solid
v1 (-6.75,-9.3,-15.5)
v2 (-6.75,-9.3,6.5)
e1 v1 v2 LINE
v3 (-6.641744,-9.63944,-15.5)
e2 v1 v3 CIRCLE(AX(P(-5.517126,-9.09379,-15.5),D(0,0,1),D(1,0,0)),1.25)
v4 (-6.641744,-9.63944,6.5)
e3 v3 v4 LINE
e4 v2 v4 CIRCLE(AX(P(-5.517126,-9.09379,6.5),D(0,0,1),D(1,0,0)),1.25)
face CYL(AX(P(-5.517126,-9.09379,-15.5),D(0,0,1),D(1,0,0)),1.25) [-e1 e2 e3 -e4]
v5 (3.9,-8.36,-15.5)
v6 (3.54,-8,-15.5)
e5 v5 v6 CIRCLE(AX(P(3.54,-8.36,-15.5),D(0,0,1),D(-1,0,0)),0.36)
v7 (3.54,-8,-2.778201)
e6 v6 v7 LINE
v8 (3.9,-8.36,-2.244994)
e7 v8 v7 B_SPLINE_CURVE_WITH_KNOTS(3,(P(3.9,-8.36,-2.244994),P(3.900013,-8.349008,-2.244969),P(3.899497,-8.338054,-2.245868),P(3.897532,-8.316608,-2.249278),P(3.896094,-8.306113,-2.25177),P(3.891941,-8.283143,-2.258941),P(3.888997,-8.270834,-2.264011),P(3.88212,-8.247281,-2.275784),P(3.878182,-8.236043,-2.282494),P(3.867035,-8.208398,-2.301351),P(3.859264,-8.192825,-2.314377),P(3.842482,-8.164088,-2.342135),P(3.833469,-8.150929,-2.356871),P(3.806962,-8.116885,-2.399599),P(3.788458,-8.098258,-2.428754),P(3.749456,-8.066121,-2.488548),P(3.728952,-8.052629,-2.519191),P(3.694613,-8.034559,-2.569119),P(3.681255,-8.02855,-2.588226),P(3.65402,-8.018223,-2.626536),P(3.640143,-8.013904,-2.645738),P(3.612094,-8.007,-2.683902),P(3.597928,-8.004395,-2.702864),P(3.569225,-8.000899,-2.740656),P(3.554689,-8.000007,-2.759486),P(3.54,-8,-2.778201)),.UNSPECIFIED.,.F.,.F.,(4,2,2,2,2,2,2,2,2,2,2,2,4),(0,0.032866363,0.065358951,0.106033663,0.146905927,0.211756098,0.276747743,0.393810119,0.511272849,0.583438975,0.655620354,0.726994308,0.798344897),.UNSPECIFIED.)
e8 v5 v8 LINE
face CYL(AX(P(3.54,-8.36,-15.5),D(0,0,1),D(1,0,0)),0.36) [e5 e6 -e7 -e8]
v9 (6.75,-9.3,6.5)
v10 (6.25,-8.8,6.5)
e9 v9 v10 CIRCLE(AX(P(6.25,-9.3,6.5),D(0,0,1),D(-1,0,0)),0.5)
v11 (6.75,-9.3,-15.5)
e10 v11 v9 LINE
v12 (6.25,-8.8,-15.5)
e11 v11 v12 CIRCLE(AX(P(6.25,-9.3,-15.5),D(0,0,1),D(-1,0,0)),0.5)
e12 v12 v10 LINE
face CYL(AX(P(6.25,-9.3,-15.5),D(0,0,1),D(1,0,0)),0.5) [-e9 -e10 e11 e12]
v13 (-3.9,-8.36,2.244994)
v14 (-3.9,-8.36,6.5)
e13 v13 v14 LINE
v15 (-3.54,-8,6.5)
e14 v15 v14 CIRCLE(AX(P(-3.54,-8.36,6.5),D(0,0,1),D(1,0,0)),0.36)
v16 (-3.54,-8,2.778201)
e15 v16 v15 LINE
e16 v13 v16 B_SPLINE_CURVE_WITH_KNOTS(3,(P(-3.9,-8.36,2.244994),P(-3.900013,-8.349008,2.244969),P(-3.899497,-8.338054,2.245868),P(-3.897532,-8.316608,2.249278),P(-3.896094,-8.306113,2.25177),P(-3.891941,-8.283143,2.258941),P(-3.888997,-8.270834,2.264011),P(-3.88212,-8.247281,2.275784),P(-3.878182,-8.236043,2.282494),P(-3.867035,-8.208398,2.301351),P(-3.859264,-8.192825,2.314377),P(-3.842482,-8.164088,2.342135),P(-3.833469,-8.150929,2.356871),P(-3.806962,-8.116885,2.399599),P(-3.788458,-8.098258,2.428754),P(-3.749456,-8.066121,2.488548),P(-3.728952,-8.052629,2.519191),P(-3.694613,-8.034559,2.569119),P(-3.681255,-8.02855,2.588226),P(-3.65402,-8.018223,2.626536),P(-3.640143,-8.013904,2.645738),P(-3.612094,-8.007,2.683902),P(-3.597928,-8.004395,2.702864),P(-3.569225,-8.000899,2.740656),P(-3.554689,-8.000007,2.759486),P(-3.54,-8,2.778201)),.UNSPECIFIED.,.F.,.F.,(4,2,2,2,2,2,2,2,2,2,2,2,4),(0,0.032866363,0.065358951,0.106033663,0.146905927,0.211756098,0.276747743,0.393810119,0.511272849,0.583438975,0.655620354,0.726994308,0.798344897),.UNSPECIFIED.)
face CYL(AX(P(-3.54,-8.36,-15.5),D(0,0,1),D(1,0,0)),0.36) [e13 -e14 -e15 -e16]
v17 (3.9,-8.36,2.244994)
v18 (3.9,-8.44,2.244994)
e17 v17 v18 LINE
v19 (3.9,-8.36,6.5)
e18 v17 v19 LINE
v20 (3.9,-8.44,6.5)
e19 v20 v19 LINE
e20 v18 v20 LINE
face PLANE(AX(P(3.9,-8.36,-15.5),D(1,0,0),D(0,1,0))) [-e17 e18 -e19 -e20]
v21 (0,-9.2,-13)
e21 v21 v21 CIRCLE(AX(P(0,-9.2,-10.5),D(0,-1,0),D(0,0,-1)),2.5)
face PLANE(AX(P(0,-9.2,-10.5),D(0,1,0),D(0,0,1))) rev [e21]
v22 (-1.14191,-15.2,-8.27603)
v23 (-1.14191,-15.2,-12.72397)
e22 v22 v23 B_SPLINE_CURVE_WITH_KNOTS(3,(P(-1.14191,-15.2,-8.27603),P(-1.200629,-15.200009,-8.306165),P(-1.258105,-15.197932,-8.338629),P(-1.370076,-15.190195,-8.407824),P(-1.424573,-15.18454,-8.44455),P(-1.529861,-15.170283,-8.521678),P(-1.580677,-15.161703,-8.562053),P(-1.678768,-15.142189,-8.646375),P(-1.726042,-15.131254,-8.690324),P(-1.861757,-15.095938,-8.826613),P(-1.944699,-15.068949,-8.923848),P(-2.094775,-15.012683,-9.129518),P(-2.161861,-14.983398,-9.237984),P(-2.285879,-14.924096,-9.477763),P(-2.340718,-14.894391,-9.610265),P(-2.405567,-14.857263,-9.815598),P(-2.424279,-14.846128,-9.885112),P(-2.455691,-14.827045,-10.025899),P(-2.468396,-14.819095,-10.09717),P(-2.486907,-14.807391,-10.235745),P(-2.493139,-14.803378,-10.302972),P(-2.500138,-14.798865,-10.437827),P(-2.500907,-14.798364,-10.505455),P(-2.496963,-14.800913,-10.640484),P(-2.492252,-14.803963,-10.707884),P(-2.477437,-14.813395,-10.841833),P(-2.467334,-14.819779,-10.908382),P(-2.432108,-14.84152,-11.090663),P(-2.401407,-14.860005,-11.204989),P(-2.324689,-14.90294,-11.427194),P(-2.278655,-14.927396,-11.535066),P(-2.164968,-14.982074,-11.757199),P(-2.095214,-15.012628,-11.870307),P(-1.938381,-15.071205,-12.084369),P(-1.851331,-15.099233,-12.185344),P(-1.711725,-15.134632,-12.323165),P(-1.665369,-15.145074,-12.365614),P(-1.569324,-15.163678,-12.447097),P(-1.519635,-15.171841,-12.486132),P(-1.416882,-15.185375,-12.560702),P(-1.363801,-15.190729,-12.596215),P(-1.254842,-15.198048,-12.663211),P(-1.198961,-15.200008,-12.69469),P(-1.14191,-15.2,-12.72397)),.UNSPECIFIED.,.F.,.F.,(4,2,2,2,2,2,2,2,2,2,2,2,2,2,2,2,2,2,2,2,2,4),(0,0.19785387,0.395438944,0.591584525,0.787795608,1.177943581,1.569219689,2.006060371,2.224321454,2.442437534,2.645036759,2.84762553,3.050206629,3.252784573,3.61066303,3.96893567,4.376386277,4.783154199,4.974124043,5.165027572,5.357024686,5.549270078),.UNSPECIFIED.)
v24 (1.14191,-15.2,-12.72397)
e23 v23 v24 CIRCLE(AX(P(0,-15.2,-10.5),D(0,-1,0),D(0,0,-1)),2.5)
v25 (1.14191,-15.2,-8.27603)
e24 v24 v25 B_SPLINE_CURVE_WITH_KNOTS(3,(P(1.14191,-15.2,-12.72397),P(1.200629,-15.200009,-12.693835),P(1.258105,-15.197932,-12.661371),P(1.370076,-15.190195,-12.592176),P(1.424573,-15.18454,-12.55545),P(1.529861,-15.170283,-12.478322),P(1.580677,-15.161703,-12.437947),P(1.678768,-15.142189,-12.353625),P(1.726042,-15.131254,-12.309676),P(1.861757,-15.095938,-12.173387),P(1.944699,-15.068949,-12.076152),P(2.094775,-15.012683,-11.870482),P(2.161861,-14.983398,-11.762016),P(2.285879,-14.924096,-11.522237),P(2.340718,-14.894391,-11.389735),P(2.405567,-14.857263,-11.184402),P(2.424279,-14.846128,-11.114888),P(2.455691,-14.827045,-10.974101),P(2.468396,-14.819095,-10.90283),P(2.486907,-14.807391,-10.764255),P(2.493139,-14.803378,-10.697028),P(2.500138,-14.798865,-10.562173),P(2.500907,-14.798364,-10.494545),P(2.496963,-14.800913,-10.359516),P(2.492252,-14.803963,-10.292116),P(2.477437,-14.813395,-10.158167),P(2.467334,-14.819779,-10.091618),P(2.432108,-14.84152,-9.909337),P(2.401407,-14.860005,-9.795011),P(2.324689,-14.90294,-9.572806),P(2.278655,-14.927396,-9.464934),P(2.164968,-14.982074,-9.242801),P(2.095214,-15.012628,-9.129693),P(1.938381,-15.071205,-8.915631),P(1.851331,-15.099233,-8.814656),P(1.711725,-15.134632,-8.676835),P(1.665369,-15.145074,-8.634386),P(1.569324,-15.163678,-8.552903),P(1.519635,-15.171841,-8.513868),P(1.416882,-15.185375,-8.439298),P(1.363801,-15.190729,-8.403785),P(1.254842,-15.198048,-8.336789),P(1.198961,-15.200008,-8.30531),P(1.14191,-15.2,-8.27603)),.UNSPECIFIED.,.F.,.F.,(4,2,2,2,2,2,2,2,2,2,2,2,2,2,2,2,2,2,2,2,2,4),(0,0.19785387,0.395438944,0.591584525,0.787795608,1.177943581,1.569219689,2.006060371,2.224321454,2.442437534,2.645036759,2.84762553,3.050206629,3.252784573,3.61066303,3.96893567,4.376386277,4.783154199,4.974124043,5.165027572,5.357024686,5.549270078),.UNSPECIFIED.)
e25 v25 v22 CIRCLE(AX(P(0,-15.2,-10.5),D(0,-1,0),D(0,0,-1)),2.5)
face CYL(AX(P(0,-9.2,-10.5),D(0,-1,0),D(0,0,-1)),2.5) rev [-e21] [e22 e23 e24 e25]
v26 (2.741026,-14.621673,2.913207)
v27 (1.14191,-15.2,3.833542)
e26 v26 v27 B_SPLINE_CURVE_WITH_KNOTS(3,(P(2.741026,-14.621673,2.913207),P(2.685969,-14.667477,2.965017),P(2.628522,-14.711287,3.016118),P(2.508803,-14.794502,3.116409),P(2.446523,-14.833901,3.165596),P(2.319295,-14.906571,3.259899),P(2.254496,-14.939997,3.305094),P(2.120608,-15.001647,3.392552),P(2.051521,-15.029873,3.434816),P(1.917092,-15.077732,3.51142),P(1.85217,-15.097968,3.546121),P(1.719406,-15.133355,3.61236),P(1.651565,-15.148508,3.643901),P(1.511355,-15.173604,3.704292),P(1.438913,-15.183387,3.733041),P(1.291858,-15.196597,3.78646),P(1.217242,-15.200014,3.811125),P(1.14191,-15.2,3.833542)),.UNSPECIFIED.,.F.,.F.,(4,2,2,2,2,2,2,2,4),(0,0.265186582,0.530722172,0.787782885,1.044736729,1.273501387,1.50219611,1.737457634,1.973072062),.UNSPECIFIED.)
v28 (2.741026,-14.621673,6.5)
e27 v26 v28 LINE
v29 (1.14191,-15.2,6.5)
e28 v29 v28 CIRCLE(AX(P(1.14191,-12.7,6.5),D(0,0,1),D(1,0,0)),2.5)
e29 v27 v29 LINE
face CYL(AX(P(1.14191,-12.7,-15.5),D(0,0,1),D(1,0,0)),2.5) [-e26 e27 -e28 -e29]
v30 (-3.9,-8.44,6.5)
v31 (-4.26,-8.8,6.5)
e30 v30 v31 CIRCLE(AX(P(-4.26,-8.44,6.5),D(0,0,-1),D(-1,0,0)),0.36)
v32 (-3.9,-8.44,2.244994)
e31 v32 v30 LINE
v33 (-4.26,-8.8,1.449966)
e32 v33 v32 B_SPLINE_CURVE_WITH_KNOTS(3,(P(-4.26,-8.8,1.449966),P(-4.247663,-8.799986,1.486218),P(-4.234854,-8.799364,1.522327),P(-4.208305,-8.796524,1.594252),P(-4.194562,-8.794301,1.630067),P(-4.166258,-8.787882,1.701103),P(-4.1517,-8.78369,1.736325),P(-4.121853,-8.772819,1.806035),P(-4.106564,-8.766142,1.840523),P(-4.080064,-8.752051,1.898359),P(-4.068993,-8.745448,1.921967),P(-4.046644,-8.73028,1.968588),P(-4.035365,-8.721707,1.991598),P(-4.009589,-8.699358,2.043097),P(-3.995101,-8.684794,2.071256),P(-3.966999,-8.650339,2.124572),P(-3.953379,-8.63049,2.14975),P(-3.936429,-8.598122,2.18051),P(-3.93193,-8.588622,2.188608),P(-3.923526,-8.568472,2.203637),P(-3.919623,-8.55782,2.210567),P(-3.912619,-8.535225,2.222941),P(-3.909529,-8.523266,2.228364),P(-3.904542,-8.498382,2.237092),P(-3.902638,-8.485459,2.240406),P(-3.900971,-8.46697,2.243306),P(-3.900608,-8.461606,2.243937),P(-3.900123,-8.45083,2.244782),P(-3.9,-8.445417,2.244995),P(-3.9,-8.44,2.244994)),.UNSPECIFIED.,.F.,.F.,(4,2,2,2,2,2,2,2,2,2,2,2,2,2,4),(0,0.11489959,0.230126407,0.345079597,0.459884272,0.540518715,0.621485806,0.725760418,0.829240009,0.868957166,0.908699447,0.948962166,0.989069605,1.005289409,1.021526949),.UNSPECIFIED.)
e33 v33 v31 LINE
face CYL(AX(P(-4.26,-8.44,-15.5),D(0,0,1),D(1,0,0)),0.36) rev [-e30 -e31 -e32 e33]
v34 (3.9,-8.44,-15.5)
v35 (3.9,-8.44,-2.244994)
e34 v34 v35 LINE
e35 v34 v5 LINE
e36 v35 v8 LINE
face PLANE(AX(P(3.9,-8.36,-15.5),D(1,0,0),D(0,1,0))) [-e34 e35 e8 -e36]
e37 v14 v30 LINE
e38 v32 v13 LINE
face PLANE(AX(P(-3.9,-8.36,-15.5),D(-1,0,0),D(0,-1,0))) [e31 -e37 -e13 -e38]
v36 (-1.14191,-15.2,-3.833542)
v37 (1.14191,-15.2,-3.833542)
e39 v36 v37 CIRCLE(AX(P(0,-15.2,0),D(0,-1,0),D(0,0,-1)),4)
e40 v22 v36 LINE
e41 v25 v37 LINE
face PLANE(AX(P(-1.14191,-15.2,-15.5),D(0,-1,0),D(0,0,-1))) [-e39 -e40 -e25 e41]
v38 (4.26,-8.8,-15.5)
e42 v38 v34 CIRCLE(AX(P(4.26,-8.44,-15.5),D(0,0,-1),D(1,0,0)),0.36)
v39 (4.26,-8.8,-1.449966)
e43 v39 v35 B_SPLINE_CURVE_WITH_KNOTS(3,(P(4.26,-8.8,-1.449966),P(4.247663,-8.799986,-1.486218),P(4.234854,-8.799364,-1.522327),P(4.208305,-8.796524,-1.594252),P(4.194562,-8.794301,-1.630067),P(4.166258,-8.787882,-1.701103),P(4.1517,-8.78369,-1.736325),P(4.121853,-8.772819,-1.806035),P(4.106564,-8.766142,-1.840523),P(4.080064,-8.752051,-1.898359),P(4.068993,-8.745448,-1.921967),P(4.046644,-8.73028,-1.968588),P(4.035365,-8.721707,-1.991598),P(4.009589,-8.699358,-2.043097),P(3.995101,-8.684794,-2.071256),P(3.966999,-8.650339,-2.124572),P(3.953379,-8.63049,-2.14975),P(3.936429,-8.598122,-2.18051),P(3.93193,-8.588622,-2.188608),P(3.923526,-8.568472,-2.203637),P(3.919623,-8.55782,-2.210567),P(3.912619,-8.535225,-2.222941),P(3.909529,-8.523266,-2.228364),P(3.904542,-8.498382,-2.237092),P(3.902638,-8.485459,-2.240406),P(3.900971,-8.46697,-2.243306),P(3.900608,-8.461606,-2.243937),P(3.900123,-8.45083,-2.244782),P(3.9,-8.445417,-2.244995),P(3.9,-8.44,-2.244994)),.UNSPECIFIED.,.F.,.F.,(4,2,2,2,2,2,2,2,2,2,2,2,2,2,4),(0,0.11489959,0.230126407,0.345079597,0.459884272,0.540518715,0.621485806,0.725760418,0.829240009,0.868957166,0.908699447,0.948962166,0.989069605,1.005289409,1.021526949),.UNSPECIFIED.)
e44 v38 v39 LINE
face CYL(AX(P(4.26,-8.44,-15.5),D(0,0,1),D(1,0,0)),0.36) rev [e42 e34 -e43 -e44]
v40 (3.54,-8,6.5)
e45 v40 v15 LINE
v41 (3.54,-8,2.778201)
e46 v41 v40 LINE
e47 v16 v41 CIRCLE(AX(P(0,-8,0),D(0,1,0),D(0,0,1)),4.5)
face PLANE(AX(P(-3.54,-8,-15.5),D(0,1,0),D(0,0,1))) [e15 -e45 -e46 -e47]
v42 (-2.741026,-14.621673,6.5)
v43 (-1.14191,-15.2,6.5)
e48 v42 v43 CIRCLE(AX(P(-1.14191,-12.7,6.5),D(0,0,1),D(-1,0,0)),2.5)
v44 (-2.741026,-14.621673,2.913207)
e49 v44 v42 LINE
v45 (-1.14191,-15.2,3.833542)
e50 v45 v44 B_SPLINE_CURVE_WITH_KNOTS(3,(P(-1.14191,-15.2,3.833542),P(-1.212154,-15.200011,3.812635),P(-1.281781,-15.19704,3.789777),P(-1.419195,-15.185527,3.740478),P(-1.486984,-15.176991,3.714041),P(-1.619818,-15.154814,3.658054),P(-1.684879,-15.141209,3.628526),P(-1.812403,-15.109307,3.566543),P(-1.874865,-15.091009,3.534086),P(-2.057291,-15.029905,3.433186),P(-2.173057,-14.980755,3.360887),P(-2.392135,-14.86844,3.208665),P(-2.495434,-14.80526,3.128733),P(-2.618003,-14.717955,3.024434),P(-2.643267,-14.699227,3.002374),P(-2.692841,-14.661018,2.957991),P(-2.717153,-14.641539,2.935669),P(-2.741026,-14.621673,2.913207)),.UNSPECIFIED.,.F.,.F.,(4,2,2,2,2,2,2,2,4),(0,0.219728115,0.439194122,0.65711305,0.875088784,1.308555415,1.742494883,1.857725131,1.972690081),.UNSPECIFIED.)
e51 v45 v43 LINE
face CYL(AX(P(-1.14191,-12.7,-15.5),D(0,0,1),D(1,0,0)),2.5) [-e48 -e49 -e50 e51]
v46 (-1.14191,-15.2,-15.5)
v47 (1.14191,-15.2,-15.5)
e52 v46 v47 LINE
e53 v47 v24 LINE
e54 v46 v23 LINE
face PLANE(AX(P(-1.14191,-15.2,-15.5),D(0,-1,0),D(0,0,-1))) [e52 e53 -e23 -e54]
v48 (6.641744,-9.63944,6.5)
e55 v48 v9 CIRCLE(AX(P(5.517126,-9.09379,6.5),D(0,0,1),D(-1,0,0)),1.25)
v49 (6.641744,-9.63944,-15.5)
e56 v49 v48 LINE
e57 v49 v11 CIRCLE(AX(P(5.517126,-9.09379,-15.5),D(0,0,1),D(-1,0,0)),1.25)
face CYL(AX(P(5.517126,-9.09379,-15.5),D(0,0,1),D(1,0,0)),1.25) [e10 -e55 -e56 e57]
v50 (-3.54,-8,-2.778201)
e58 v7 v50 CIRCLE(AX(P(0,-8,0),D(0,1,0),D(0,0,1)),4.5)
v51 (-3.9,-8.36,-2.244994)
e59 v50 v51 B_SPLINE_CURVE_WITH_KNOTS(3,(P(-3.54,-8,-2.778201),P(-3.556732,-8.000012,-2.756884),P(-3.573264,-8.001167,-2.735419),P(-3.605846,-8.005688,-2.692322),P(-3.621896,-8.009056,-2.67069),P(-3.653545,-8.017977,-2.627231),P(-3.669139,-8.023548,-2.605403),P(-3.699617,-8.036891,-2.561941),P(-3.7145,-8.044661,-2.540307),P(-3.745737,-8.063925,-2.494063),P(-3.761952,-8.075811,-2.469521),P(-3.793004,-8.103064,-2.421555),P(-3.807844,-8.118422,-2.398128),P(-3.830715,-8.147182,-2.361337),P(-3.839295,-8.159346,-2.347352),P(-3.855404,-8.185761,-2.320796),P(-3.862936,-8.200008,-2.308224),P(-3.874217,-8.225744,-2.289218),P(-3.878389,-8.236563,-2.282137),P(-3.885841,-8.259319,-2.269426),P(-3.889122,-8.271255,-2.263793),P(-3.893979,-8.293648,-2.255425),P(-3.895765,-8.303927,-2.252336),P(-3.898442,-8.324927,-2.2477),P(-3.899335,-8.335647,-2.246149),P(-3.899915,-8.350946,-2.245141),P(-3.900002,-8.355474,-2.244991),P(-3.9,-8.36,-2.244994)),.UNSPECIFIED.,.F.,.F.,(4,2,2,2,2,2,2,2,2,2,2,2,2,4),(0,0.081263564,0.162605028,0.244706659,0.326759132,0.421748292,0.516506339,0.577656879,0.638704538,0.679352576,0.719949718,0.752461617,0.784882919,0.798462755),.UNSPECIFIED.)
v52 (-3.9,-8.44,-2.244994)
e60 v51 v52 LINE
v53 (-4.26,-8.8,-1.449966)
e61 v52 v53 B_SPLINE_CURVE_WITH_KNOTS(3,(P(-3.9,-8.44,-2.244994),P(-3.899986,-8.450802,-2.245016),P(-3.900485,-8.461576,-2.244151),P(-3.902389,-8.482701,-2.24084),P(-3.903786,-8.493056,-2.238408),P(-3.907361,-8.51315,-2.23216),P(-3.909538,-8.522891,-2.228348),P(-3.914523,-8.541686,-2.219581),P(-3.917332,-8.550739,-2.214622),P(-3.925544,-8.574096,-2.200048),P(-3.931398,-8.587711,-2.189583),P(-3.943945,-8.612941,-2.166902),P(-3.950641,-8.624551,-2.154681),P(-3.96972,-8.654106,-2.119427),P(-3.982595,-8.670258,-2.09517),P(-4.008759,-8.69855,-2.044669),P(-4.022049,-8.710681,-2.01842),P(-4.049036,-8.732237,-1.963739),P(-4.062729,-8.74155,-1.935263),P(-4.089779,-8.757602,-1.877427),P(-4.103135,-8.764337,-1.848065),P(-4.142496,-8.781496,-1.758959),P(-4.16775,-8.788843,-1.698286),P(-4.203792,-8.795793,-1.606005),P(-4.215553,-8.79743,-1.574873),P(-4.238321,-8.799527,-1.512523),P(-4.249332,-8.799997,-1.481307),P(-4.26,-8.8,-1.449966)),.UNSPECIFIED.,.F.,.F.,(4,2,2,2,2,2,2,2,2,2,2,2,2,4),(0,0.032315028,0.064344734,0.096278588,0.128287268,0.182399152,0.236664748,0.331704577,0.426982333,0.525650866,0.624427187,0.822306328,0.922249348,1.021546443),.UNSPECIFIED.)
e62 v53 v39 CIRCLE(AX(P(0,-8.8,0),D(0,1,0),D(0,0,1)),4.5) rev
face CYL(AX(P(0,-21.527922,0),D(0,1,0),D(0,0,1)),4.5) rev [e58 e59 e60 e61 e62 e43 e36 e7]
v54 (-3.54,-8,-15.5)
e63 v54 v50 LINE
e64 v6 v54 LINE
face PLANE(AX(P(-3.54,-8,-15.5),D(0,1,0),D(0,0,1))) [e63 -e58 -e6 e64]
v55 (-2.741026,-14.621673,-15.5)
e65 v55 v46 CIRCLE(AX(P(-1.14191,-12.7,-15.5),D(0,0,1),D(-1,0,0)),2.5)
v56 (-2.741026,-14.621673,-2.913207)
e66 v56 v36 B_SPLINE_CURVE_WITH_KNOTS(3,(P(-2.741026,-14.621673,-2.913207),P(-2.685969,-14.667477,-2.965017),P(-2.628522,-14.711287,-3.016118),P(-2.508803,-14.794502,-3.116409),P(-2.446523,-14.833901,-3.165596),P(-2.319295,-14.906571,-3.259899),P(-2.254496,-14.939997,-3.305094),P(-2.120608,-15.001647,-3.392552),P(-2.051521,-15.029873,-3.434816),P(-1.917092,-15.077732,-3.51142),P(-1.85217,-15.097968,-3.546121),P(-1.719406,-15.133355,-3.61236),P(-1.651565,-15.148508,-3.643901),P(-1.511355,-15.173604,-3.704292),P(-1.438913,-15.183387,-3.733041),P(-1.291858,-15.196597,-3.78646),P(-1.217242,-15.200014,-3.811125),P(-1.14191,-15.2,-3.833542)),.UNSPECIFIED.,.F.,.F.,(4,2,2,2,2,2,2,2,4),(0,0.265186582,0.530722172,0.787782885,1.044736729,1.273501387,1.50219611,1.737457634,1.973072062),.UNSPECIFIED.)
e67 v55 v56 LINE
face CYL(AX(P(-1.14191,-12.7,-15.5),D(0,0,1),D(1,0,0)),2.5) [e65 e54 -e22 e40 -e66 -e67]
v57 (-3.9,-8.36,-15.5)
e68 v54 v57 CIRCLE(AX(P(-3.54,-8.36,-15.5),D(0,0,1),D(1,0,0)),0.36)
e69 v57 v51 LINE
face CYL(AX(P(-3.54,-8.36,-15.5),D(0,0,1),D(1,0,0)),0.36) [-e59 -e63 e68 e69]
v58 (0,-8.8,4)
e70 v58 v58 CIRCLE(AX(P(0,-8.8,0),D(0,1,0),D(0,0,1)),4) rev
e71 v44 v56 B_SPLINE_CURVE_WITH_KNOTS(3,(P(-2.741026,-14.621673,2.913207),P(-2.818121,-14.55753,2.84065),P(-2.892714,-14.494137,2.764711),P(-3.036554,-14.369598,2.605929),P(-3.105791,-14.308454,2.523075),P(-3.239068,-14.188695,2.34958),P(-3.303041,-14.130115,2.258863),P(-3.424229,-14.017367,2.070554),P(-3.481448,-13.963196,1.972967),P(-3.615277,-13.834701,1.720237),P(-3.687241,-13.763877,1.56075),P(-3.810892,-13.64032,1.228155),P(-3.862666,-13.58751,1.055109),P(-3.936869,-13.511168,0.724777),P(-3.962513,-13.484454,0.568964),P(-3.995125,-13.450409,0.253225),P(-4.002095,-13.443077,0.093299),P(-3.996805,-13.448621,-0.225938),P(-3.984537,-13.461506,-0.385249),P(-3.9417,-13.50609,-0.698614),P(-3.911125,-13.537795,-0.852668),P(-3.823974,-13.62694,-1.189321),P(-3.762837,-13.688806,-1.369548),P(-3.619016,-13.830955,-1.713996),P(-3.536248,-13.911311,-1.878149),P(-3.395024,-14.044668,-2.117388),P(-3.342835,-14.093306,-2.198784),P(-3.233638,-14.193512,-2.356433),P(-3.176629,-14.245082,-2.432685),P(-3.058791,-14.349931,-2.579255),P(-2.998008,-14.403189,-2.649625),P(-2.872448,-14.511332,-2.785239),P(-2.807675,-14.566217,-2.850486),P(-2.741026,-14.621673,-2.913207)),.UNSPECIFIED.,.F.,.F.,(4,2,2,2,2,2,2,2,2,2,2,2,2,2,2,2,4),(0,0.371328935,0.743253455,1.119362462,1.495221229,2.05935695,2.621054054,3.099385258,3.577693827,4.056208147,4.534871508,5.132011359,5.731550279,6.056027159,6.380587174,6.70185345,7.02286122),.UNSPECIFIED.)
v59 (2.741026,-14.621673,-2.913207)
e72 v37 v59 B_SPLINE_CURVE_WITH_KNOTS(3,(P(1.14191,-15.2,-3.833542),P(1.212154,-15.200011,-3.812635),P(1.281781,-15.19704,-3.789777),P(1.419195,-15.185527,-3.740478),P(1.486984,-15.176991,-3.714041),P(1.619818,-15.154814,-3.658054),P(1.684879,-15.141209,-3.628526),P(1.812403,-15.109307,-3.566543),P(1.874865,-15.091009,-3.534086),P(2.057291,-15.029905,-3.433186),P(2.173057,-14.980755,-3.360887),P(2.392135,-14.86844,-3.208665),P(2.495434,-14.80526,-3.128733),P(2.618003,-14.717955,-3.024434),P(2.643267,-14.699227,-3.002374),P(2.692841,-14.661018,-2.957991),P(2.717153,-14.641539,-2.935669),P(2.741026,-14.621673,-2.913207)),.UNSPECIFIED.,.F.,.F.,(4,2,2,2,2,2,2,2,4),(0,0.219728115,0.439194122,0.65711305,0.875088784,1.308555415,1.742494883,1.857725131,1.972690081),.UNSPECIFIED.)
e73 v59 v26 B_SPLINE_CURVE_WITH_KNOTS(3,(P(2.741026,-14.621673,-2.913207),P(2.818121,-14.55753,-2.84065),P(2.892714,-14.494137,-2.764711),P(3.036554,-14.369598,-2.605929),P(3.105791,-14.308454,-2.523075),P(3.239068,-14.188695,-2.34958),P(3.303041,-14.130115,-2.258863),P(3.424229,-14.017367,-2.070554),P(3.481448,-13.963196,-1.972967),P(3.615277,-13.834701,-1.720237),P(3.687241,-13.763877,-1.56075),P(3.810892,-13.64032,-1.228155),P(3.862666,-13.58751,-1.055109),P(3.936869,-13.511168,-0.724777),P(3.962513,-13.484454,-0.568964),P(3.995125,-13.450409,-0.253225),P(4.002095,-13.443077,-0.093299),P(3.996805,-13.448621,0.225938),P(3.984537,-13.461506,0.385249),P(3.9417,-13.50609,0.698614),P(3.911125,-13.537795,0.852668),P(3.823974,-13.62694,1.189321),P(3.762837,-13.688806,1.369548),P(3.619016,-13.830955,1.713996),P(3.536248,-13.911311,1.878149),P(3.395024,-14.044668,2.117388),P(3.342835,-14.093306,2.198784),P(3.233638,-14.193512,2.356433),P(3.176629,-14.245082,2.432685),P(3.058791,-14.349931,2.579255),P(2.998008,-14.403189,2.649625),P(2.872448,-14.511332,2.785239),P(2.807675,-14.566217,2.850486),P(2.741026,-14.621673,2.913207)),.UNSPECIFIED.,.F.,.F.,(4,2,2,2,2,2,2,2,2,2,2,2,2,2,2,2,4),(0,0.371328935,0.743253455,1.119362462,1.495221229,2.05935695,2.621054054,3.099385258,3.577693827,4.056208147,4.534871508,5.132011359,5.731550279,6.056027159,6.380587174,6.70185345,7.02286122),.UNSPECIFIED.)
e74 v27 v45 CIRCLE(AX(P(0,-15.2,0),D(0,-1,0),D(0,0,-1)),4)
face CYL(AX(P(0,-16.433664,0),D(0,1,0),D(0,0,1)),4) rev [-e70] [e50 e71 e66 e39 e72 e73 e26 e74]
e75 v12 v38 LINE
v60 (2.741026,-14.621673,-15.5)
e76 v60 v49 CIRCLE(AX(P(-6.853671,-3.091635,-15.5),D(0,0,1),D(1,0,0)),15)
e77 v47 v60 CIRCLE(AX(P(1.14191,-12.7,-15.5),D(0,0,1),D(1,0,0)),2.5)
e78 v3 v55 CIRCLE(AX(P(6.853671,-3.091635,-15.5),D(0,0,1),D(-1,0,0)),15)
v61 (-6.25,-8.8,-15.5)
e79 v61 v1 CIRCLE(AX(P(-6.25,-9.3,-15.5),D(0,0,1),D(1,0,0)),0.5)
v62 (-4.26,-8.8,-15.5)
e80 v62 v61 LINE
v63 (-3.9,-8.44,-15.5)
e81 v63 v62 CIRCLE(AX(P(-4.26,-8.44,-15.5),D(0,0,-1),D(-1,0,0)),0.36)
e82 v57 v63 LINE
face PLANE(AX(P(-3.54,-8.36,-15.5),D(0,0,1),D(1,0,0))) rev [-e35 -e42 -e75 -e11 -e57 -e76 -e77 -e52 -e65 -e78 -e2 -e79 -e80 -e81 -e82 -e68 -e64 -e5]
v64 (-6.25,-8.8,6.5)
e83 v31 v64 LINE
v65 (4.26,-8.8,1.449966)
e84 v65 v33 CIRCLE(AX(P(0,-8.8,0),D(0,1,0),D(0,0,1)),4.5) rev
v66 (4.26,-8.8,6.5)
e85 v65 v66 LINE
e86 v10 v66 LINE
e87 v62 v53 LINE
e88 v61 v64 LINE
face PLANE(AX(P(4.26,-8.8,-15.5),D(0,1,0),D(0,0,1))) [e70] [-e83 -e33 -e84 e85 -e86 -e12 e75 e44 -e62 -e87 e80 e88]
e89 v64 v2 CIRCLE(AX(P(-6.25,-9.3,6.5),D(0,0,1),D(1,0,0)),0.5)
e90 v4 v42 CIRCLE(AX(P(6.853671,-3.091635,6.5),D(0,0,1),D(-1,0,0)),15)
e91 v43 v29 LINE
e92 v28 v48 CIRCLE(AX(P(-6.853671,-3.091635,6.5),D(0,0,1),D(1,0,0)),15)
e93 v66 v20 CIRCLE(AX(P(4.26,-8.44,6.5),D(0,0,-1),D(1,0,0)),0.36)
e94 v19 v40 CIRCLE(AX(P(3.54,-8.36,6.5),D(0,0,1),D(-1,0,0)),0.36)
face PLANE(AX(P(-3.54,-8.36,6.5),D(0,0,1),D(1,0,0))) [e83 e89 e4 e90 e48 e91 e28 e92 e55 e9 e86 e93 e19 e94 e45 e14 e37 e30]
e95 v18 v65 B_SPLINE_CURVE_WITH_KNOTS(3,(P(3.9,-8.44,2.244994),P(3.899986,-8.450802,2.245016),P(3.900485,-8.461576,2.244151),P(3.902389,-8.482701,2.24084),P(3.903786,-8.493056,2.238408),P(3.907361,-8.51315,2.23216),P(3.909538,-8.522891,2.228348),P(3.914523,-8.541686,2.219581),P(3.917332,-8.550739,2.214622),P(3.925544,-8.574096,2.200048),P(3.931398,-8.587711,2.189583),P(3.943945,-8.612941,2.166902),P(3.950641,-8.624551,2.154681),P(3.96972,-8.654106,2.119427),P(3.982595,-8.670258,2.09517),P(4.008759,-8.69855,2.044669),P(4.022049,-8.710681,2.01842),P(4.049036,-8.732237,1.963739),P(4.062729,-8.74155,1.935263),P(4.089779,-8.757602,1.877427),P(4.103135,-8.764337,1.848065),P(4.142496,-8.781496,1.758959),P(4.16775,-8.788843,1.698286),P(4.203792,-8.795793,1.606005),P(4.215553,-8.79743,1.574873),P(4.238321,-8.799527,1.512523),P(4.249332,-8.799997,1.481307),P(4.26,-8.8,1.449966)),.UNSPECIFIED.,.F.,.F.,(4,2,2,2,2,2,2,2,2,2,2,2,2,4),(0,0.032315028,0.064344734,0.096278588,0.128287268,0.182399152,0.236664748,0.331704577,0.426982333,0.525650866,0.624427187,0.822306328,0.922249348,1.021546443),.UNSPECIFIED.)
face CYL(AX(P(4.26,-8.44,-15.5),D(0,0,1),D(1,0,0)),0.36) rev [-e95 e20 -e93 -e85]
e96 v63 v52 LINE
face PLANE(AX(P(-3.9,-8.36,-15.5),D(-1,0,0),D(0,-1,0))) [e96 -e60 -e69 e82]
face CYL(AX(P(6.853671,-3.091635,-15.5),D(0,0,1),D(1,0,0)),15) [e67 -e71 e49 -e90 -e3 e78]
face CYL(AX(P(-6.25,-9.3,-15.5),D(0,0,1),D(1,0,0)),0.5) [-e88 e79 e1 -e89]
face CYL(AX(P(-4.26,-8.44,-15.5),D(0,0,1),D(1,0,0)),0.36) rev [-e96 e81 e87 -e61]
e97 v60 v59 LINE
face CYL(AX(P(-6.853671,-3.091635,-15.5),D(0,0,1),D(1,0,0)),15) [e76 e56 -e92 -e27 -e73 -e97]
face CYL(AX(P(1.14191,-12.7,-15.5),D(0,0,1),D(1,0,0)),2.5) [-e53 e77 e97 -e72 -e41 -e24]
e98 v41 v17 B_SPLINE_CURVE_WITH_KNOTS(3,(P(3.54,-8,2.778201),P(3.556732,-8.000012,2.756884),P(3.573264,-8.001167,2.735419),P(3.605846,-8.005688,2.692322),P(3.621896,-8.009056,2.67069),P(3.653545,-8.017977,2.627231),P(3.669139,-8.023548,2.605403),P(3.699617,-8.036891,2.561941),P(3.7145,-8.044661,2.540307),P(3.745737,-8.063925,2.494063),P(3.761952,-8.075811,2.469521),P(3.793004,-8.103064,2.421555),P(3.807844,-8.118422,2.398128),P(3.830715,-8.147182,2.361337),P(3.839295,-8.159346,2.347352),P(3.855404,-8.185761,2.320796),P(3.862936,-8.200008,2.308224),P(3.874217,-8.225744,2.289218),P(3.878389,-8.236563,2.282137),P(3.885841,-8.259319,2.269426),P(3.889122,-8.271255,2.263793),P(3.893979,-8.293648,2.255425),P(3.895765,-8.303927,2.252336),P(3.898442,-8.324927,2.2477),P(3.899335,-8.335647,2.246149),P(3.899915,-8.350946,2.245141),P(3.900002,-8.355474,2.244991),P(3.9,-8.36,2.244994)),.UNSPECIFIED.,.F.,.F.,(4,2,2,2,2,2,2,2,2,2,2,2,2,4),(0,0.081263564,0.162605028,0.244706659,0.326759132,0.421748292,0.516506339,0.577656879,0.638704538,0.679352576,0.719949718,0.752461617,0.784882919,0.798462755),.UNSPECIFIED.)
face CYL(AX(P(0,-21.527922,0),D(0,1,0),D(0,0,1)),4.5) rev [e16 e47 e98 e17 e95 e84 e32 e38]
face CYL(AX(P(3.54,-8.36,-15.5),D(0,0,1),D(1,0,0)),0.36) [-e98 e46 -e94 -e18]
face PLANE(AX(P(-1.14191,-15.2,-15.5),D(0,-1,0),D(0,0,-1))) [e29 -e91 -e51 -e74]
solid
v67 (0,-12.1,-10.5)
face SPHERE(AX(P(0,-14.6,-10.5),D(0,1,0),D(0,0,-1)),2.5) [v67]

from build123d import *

# Parameters (mm, degrees)
SKETCH1_R           = 4
BOSS_EXTRUDE1_DEPTH = 16
CUT_SWEEP1_PITCH    = 1.25
SKETCH4_OUTSIDE_W   = 16.42
SKETCH4_OUTSIDE_H   = 16.42
SKETCH4_OUTSIDE_R   = 3.052784715
CUT_EXTRUDE1_DEPTH  = 1.25
CUT_EXTRUDE1_DRAFT  = -45
CUT_EXTRUDE2_DEPTH  = 3
BOSS_EXTRUDE2_START = 6.5
BOSS_EXTRUDE2_DEPTH = 22
SKETCH9_R           = 4
CUT_EXTRUDE4_DEPTH  = 24.350588956
SKETCH10_W          = 2.5
SKETCH10_H          = 6
CUT_EXTRUDE5_REACH  = 23.048
SKETCH12_R          = 4.5


with BuildPart() as part:
    # Sketch1 → Boss-Extrude1 (new body)
    with BuildSketch(Plane(origin=(0, 0, 0), x_dir=(1, 0, 0), z_dir=(0, 1, 0))):
        with Locations(Location((0, 0, 0), (0, 0, 270))):
            Circle(SKETCH1_R)
    extrude(amount=-BOSS_EXTRUDE1_DEPTH)

    # Cut-Sweep1: the profile of Sketch3 screwed along a right-hand helix of 13.8 turns, 8 arcs to a turn; built about Z, then put on its axis
    cut_sweep1_z = Axis((0, 0, 0), (0, 0, 1))
    cut_sweep1_corners = [(3.188101184, 0, -0.46875), (4.067658235, 0, 0.0390625), (4.067658235, 0, -1.1328125), (3.188101184, 0, -0.625)]
    with BuildLine(mode=Mode.PRIVATE) as cut_sweep1_profile:
        Line(cut_sweep1_corners[0], cut_sweep1_corners[1])
        Line(cut_sweep1_corners[1], cut_sweep1_corners[2])
        Line(cut_sweep1_corners[2], cut_sweep1_corners[3])
        Line(cut_sweep1_corners[3], cut_sweep1_corners[0])
    cut_sweep1_cap = Face(cut_sweep1_profile.wire())
    cut_sweep1_turn_angles = [0, 22.5, 45, 67.5, 90, 112.5, 135, 157.5, 180, 202.5, 225, 247.5, 270, 292.5, 315, 337.5, 360]
    cut_sweep1_turn_weights = [1, 0.9238795325112867, 1, 0.9238795325112867, 1, 0.9238795325112867, 1, 0.9238795325112867, 1, 0.9238795325112867, 1, 0.9238795325112867, 1, 0.9238795325112867, 1, 0.9238795325112867, 1]
    cut_sweep1_turn_rails = [Edge.make_bspline([Vector(p[0], p[1], 0).rotate(cut_sweep1_z, cut_sweep1_turn_angles[k]) / cut_sweep1_turn_weights[k] + Vector(0, 0, p[2] + CUT_SWEEP1_PITCH * cut_sweep1_turn_angles[k] / 360) for k in range(17)], [0, 0, 0, 1, 1, 2, 2, 3, 3, 4, 4, 5, 5, 6, 6, 7, 7, 8, 8, 8], 2, cut_sweep1_turn_weights) for p in cut_sweep1_corners]
    cut_sweep1_turn_sides = [Face.make_surface_from_curves(cut_sweep1_turn_rails[p[0]], cut_sweep1_turn_rails[p[1]]) for p in [(0, 1), (1, 2), (2, 3), (3, 0)]]
    cut_sweep1_last_angles = [4680, 4702.5, 4725, 4747.5, 4770, 4792.5, 4815, 4837.5, 4860, 4882.5, 4905, 4927.5, 4950, 4959, 4968]
    cut_sweep1_last_weights = [1, 0.9238795325112867, 1, 0.9238795325112867, 1, 0.9238795325112867, 1, 0.9238795325112867, 1, 0.9238795325112867, 1, 0.9238795325112867, 1, 0.9876883405951427, 1]
    cut_sweep1_last_rails = [Edge.make_bspline([Vector(p[0], p[1], 0).rotate(cut_sweep1_z, cut_sweep1_last_angles[k]) / cut_sweep1_last_weights[k] + Vector(0, 0, p[2] + CUT_SWEEP1_PITCH * cut_sweep1_last_angles[k] / 360) for k in range(15)], [0, 0, 0, 1, 1, 2, 2, 3, 3, 4, 4, 5, 5, 6, 6, 7, 7, 7], 2, cut_sweep1_last_weights) for p in cut_sweep1_corners]
    cut_sweep1_last_sides = [Face.make_surface_from_curves(cut_sweep1_last_rails[p[0]], cut_sweep1_last_rails[p[1]]) for p in [(0, 1), (1, 2), (2, 3), (3, 0)]]
    cut_sweep1 = Plane(origin=(0, -16, 0), x_dir=(0, 0, -1), z_dir=(0, 1, 0)) * Solid(Shell([*[p.moved(Location((0, 0, CUT_SWEEP1_PITCH * i))) for i in range(13) for p in cut_sweep1_turn_sides], *cut_sweep1_last_sides, cut_sweep1_cap, cut_sweep1_cap.rotate(cut_sweep1_z, 4968).moved(Location((0, 0, CUT_SWEEP1_PITCH * 4968 / 360)))]))
    add(cut_sweep1, mode=Mode.SUBTRACT)


with BuildPart() as cut_extrude1_tool:
    # Sketch4 outside → Cut-Extrude1 (with draft: the straight prism first)
    with BuildSketch(Plane.XZ.offset(16)):
        Rectangle(SKETCH4_OUTSIDE_W, SKETCH4_OUTSIDE_H)
        Circle(SKETCH4_OUTSIDE_R, mode=Mode.SUBTRACT)
    extrude(amount=-CUT_EXTRUDE1_DEPTH)
    # Cut-Extrude1: the draft: its side faces are tilted about the plane it starts from
    cut_extrude1_sides = [cut_extrude1_tool.faces().sort_by_distance(p)[0] for p in [
        (0, -15.375, -8.21),
        (8.21, -15.375, 0),
        (0, -15.375, 8.21),
        (-8.21, -15.375, 0),
        (-3.052784715, -15.375, 0),
    ]]
    draft(cut_extrude1_sides, Plane.XZ.offset(16), CUT_EXTRUDE1_DRAFT)


with BuildPart() as part_1:
    add(part.part)

    # Cut-Extrude1: cut by cut_extrude1_tool
    add(cut_extrude1_tool.part, mode=Mode.SUBTRACT)

    # Sketch5 → Revolve1 (revolve)
    with BuildSketch(Plane.XY, mode=Mode.PRIVATE) as revolve1_sk:
        with BuildLine():
            Line((0, 4.4), (0, 0))
            Line((0, 0), (-7, 0))
            Line((-7, 0), (-7, 1.1))
            ThreePointArc((-7, 1.1), (-5.74216858, 2.970153254), (-4, 4.4))
            Line((-4, 4.4), (0, 4.4))
        make_face()
    revolve(revolve1_sk.sketch.rotate(Axis((0, 0, 0), (0, -1, 0)), 90), axis=Axis((0, 0, 0), (0, -1, 0)))

    # Sketch6 → Cut-Extrude2 (cut)
    with BuildSketch(Plane(origin=(0, 4.4, 0), x_dir=(1, 0, 0), z_dir=(0, 1, 0))):
        Polygon((0, 2.886751346), (-2.5, 1.443375673), (-2.5, -1.443375673), (0, -2.886751346), (2.5, -1.443375673), (2.5, 1.443375673), align=None)
    extrude(amount=-CUT_EXTRUDE2_DEPTH, mode=Mode.SUBTRACT)

    # Cut-Extrude3 cone 1 section (through the dimple's axis) → Cut-Extrude3 (revolve, cut)
    with BuildSketch(Plane(origin=(0, 4.4, 0), x_dir=(0, 0, 1), z_dir=(1, 0, 0))):
        Polygon((0, 0), (2.886751346, 0), (0, 2.886751346), align=None)
    revolve(axis=Axis((0, 4.4, 0), (0, -1, 0)), mode=Mode.SUBTRACT)


with BuildPart() as body_2:
    # Sketch8 → Boss-Extrude2 (new body)
    with BuildSketch(Plane.XY.offset(BOSS_EXTRUDE2_START)):
        with BuildLine():
            Line((-1.141910018, -15.2), (1.141910018, -15.2))
            ThreePointArc((1.141910018, -15.2), (1.992150427, -15.050976658), (2.741026302, -14.621672998))
            ThreePointArc((2.741026302, -14.621672998), (4.957086228, -12.338580682), (6.641744362, -9.639440246))
            ThreePointArc((6.641744362, -9.639440246), (6.708027965, -9.473596894), (6.75, -9.3))
            ThreePointArc((6.75, -9.3), (6.603553391, -8.946446609), (6.25, -8.8))
            Line((6.25, -8.8), (4.26, -8.8))
            ThreePointArc((4.26, -8.8), (4.005441559, -8.694558441), (3.9, -8.44))
            Line((3.9, -8.44), (3.9, -8.36))
            ThreePointArc((3.9, -8.36), (3.794558441, -8.105441559), (3.54, -8))
            Line((3.54, -8), (-3.54, -8))
            ThreePointArc((-3.54, -8), (-3.794558441, -8.105441559), (-3.9, -8.36))
            Line((-3.9, -8.36), (-3.9, -8.44))
            ThreePointArc((-3.9, -8.44), (-4.005441559, -8.694558441), (-4.26, -8.8))
            Line((-4.26, -8.8), (-6.25, -8.8))
            ThreePointArc((-6.25, -8.8), (-6.603553391, -8.946446609), (-6.75, -9.3))
            ThreePointArc((-6.75, -9.3), (-6.708027965, -9.473596894), (-6.641744362, -9.639440246))
            ThreePointArc((-6.641744362, -9.639440246), (-4.957086228, -12.338580682), (-2.741026302, -14.621672998))
            ThreePointArc((-2.741026302, -14.621672998), (-1.992150427, -15.050976658), (-1.141910018, -15.2))
        make_face()
    extrude(amount=-BOSS_EXTRUDE2_DEPTH)

    # Sketch9 → Cut-Extrude4 (cut, through all)
    with BuildSketch(Plane(origin=(0, 0, 0), x_dir=(1, 0, 0), z_dir=(0, 1, 0))):
        with Locations(Location((0, 0, 0), (0, 0, 286.587393433))):
            Circle(SKETCH9_R)
    extrude(amount=-CUT_EXTRUDE4_DEPTH, mode=Mode.SUBTRACT)

    # Sketch10 → Cut-Revolve1 (revolve, cut)
    with BuildSketch(Plane(origin=(0, 0, 0), x_dir=(0, 0, -1), z_dir=(1, 0, 0))):
        with Locations((11.75, -12.2)):
            Rectangle(SKETCH10_W, SKETCH10_H)
    revolve(axis=Axis((0, -9.2, -10.5), (0, 1, 0)), mode=Mode.SUBTRACT)

    # Cut-Extrude5: up to this face of the body (flat: up to its plane)
    cut_extrude5_end = Plane(body_2.part.faces().sort_by_distance((5.255, -8.8, -4.5))[0])
    # Sketch12 → Cut-Extrude5 (cut, up to the picked face)
    with BuildSketch(Plane(origin=(0, -8, 0), x_dir=(1, 0, 0), z_dir=(0, 1, 0)), mode=Mode.PRIVATE) as cut_extrude5_sk1:
        Circle(SKETCH12_R)
    cut_extrude5_tool1 = split(extrude(cut_extrude5_sk1.sketch, amount=-CUT_EXTRUDE5_REACH, mode=Mode.PRIVATE), bisect_by=cut_extrude5_end, keep=Keep.BOTH, mode=Mode.PRIVATE)
    add(cut_extrude5_tool1.solids().sort_by(Axis((0, -8, 0), (0, -1, 0)))[0], mode=Mode.SUBTRACT)


with BuildPart() as body_3:
    # Sketch11 → Revolve2 (revolve)
    with BuildSketch(Plane(origin=(0, 0, 0), x_dir=(0, 0, -1), z_dir=(1, 0, 0))):
        with BuildLine():
            Line((10.5, -12.1), (10.5, -17.1))
            ThreePointArc((10.5, -17.1), (13, -14.6), (10.5, -12.1))
        make_face()
    revolve(axis=Axis((0, -12.1, -10.5), (0, -1, 0)))


solid = Compound([body_2.part, body_3.part])
